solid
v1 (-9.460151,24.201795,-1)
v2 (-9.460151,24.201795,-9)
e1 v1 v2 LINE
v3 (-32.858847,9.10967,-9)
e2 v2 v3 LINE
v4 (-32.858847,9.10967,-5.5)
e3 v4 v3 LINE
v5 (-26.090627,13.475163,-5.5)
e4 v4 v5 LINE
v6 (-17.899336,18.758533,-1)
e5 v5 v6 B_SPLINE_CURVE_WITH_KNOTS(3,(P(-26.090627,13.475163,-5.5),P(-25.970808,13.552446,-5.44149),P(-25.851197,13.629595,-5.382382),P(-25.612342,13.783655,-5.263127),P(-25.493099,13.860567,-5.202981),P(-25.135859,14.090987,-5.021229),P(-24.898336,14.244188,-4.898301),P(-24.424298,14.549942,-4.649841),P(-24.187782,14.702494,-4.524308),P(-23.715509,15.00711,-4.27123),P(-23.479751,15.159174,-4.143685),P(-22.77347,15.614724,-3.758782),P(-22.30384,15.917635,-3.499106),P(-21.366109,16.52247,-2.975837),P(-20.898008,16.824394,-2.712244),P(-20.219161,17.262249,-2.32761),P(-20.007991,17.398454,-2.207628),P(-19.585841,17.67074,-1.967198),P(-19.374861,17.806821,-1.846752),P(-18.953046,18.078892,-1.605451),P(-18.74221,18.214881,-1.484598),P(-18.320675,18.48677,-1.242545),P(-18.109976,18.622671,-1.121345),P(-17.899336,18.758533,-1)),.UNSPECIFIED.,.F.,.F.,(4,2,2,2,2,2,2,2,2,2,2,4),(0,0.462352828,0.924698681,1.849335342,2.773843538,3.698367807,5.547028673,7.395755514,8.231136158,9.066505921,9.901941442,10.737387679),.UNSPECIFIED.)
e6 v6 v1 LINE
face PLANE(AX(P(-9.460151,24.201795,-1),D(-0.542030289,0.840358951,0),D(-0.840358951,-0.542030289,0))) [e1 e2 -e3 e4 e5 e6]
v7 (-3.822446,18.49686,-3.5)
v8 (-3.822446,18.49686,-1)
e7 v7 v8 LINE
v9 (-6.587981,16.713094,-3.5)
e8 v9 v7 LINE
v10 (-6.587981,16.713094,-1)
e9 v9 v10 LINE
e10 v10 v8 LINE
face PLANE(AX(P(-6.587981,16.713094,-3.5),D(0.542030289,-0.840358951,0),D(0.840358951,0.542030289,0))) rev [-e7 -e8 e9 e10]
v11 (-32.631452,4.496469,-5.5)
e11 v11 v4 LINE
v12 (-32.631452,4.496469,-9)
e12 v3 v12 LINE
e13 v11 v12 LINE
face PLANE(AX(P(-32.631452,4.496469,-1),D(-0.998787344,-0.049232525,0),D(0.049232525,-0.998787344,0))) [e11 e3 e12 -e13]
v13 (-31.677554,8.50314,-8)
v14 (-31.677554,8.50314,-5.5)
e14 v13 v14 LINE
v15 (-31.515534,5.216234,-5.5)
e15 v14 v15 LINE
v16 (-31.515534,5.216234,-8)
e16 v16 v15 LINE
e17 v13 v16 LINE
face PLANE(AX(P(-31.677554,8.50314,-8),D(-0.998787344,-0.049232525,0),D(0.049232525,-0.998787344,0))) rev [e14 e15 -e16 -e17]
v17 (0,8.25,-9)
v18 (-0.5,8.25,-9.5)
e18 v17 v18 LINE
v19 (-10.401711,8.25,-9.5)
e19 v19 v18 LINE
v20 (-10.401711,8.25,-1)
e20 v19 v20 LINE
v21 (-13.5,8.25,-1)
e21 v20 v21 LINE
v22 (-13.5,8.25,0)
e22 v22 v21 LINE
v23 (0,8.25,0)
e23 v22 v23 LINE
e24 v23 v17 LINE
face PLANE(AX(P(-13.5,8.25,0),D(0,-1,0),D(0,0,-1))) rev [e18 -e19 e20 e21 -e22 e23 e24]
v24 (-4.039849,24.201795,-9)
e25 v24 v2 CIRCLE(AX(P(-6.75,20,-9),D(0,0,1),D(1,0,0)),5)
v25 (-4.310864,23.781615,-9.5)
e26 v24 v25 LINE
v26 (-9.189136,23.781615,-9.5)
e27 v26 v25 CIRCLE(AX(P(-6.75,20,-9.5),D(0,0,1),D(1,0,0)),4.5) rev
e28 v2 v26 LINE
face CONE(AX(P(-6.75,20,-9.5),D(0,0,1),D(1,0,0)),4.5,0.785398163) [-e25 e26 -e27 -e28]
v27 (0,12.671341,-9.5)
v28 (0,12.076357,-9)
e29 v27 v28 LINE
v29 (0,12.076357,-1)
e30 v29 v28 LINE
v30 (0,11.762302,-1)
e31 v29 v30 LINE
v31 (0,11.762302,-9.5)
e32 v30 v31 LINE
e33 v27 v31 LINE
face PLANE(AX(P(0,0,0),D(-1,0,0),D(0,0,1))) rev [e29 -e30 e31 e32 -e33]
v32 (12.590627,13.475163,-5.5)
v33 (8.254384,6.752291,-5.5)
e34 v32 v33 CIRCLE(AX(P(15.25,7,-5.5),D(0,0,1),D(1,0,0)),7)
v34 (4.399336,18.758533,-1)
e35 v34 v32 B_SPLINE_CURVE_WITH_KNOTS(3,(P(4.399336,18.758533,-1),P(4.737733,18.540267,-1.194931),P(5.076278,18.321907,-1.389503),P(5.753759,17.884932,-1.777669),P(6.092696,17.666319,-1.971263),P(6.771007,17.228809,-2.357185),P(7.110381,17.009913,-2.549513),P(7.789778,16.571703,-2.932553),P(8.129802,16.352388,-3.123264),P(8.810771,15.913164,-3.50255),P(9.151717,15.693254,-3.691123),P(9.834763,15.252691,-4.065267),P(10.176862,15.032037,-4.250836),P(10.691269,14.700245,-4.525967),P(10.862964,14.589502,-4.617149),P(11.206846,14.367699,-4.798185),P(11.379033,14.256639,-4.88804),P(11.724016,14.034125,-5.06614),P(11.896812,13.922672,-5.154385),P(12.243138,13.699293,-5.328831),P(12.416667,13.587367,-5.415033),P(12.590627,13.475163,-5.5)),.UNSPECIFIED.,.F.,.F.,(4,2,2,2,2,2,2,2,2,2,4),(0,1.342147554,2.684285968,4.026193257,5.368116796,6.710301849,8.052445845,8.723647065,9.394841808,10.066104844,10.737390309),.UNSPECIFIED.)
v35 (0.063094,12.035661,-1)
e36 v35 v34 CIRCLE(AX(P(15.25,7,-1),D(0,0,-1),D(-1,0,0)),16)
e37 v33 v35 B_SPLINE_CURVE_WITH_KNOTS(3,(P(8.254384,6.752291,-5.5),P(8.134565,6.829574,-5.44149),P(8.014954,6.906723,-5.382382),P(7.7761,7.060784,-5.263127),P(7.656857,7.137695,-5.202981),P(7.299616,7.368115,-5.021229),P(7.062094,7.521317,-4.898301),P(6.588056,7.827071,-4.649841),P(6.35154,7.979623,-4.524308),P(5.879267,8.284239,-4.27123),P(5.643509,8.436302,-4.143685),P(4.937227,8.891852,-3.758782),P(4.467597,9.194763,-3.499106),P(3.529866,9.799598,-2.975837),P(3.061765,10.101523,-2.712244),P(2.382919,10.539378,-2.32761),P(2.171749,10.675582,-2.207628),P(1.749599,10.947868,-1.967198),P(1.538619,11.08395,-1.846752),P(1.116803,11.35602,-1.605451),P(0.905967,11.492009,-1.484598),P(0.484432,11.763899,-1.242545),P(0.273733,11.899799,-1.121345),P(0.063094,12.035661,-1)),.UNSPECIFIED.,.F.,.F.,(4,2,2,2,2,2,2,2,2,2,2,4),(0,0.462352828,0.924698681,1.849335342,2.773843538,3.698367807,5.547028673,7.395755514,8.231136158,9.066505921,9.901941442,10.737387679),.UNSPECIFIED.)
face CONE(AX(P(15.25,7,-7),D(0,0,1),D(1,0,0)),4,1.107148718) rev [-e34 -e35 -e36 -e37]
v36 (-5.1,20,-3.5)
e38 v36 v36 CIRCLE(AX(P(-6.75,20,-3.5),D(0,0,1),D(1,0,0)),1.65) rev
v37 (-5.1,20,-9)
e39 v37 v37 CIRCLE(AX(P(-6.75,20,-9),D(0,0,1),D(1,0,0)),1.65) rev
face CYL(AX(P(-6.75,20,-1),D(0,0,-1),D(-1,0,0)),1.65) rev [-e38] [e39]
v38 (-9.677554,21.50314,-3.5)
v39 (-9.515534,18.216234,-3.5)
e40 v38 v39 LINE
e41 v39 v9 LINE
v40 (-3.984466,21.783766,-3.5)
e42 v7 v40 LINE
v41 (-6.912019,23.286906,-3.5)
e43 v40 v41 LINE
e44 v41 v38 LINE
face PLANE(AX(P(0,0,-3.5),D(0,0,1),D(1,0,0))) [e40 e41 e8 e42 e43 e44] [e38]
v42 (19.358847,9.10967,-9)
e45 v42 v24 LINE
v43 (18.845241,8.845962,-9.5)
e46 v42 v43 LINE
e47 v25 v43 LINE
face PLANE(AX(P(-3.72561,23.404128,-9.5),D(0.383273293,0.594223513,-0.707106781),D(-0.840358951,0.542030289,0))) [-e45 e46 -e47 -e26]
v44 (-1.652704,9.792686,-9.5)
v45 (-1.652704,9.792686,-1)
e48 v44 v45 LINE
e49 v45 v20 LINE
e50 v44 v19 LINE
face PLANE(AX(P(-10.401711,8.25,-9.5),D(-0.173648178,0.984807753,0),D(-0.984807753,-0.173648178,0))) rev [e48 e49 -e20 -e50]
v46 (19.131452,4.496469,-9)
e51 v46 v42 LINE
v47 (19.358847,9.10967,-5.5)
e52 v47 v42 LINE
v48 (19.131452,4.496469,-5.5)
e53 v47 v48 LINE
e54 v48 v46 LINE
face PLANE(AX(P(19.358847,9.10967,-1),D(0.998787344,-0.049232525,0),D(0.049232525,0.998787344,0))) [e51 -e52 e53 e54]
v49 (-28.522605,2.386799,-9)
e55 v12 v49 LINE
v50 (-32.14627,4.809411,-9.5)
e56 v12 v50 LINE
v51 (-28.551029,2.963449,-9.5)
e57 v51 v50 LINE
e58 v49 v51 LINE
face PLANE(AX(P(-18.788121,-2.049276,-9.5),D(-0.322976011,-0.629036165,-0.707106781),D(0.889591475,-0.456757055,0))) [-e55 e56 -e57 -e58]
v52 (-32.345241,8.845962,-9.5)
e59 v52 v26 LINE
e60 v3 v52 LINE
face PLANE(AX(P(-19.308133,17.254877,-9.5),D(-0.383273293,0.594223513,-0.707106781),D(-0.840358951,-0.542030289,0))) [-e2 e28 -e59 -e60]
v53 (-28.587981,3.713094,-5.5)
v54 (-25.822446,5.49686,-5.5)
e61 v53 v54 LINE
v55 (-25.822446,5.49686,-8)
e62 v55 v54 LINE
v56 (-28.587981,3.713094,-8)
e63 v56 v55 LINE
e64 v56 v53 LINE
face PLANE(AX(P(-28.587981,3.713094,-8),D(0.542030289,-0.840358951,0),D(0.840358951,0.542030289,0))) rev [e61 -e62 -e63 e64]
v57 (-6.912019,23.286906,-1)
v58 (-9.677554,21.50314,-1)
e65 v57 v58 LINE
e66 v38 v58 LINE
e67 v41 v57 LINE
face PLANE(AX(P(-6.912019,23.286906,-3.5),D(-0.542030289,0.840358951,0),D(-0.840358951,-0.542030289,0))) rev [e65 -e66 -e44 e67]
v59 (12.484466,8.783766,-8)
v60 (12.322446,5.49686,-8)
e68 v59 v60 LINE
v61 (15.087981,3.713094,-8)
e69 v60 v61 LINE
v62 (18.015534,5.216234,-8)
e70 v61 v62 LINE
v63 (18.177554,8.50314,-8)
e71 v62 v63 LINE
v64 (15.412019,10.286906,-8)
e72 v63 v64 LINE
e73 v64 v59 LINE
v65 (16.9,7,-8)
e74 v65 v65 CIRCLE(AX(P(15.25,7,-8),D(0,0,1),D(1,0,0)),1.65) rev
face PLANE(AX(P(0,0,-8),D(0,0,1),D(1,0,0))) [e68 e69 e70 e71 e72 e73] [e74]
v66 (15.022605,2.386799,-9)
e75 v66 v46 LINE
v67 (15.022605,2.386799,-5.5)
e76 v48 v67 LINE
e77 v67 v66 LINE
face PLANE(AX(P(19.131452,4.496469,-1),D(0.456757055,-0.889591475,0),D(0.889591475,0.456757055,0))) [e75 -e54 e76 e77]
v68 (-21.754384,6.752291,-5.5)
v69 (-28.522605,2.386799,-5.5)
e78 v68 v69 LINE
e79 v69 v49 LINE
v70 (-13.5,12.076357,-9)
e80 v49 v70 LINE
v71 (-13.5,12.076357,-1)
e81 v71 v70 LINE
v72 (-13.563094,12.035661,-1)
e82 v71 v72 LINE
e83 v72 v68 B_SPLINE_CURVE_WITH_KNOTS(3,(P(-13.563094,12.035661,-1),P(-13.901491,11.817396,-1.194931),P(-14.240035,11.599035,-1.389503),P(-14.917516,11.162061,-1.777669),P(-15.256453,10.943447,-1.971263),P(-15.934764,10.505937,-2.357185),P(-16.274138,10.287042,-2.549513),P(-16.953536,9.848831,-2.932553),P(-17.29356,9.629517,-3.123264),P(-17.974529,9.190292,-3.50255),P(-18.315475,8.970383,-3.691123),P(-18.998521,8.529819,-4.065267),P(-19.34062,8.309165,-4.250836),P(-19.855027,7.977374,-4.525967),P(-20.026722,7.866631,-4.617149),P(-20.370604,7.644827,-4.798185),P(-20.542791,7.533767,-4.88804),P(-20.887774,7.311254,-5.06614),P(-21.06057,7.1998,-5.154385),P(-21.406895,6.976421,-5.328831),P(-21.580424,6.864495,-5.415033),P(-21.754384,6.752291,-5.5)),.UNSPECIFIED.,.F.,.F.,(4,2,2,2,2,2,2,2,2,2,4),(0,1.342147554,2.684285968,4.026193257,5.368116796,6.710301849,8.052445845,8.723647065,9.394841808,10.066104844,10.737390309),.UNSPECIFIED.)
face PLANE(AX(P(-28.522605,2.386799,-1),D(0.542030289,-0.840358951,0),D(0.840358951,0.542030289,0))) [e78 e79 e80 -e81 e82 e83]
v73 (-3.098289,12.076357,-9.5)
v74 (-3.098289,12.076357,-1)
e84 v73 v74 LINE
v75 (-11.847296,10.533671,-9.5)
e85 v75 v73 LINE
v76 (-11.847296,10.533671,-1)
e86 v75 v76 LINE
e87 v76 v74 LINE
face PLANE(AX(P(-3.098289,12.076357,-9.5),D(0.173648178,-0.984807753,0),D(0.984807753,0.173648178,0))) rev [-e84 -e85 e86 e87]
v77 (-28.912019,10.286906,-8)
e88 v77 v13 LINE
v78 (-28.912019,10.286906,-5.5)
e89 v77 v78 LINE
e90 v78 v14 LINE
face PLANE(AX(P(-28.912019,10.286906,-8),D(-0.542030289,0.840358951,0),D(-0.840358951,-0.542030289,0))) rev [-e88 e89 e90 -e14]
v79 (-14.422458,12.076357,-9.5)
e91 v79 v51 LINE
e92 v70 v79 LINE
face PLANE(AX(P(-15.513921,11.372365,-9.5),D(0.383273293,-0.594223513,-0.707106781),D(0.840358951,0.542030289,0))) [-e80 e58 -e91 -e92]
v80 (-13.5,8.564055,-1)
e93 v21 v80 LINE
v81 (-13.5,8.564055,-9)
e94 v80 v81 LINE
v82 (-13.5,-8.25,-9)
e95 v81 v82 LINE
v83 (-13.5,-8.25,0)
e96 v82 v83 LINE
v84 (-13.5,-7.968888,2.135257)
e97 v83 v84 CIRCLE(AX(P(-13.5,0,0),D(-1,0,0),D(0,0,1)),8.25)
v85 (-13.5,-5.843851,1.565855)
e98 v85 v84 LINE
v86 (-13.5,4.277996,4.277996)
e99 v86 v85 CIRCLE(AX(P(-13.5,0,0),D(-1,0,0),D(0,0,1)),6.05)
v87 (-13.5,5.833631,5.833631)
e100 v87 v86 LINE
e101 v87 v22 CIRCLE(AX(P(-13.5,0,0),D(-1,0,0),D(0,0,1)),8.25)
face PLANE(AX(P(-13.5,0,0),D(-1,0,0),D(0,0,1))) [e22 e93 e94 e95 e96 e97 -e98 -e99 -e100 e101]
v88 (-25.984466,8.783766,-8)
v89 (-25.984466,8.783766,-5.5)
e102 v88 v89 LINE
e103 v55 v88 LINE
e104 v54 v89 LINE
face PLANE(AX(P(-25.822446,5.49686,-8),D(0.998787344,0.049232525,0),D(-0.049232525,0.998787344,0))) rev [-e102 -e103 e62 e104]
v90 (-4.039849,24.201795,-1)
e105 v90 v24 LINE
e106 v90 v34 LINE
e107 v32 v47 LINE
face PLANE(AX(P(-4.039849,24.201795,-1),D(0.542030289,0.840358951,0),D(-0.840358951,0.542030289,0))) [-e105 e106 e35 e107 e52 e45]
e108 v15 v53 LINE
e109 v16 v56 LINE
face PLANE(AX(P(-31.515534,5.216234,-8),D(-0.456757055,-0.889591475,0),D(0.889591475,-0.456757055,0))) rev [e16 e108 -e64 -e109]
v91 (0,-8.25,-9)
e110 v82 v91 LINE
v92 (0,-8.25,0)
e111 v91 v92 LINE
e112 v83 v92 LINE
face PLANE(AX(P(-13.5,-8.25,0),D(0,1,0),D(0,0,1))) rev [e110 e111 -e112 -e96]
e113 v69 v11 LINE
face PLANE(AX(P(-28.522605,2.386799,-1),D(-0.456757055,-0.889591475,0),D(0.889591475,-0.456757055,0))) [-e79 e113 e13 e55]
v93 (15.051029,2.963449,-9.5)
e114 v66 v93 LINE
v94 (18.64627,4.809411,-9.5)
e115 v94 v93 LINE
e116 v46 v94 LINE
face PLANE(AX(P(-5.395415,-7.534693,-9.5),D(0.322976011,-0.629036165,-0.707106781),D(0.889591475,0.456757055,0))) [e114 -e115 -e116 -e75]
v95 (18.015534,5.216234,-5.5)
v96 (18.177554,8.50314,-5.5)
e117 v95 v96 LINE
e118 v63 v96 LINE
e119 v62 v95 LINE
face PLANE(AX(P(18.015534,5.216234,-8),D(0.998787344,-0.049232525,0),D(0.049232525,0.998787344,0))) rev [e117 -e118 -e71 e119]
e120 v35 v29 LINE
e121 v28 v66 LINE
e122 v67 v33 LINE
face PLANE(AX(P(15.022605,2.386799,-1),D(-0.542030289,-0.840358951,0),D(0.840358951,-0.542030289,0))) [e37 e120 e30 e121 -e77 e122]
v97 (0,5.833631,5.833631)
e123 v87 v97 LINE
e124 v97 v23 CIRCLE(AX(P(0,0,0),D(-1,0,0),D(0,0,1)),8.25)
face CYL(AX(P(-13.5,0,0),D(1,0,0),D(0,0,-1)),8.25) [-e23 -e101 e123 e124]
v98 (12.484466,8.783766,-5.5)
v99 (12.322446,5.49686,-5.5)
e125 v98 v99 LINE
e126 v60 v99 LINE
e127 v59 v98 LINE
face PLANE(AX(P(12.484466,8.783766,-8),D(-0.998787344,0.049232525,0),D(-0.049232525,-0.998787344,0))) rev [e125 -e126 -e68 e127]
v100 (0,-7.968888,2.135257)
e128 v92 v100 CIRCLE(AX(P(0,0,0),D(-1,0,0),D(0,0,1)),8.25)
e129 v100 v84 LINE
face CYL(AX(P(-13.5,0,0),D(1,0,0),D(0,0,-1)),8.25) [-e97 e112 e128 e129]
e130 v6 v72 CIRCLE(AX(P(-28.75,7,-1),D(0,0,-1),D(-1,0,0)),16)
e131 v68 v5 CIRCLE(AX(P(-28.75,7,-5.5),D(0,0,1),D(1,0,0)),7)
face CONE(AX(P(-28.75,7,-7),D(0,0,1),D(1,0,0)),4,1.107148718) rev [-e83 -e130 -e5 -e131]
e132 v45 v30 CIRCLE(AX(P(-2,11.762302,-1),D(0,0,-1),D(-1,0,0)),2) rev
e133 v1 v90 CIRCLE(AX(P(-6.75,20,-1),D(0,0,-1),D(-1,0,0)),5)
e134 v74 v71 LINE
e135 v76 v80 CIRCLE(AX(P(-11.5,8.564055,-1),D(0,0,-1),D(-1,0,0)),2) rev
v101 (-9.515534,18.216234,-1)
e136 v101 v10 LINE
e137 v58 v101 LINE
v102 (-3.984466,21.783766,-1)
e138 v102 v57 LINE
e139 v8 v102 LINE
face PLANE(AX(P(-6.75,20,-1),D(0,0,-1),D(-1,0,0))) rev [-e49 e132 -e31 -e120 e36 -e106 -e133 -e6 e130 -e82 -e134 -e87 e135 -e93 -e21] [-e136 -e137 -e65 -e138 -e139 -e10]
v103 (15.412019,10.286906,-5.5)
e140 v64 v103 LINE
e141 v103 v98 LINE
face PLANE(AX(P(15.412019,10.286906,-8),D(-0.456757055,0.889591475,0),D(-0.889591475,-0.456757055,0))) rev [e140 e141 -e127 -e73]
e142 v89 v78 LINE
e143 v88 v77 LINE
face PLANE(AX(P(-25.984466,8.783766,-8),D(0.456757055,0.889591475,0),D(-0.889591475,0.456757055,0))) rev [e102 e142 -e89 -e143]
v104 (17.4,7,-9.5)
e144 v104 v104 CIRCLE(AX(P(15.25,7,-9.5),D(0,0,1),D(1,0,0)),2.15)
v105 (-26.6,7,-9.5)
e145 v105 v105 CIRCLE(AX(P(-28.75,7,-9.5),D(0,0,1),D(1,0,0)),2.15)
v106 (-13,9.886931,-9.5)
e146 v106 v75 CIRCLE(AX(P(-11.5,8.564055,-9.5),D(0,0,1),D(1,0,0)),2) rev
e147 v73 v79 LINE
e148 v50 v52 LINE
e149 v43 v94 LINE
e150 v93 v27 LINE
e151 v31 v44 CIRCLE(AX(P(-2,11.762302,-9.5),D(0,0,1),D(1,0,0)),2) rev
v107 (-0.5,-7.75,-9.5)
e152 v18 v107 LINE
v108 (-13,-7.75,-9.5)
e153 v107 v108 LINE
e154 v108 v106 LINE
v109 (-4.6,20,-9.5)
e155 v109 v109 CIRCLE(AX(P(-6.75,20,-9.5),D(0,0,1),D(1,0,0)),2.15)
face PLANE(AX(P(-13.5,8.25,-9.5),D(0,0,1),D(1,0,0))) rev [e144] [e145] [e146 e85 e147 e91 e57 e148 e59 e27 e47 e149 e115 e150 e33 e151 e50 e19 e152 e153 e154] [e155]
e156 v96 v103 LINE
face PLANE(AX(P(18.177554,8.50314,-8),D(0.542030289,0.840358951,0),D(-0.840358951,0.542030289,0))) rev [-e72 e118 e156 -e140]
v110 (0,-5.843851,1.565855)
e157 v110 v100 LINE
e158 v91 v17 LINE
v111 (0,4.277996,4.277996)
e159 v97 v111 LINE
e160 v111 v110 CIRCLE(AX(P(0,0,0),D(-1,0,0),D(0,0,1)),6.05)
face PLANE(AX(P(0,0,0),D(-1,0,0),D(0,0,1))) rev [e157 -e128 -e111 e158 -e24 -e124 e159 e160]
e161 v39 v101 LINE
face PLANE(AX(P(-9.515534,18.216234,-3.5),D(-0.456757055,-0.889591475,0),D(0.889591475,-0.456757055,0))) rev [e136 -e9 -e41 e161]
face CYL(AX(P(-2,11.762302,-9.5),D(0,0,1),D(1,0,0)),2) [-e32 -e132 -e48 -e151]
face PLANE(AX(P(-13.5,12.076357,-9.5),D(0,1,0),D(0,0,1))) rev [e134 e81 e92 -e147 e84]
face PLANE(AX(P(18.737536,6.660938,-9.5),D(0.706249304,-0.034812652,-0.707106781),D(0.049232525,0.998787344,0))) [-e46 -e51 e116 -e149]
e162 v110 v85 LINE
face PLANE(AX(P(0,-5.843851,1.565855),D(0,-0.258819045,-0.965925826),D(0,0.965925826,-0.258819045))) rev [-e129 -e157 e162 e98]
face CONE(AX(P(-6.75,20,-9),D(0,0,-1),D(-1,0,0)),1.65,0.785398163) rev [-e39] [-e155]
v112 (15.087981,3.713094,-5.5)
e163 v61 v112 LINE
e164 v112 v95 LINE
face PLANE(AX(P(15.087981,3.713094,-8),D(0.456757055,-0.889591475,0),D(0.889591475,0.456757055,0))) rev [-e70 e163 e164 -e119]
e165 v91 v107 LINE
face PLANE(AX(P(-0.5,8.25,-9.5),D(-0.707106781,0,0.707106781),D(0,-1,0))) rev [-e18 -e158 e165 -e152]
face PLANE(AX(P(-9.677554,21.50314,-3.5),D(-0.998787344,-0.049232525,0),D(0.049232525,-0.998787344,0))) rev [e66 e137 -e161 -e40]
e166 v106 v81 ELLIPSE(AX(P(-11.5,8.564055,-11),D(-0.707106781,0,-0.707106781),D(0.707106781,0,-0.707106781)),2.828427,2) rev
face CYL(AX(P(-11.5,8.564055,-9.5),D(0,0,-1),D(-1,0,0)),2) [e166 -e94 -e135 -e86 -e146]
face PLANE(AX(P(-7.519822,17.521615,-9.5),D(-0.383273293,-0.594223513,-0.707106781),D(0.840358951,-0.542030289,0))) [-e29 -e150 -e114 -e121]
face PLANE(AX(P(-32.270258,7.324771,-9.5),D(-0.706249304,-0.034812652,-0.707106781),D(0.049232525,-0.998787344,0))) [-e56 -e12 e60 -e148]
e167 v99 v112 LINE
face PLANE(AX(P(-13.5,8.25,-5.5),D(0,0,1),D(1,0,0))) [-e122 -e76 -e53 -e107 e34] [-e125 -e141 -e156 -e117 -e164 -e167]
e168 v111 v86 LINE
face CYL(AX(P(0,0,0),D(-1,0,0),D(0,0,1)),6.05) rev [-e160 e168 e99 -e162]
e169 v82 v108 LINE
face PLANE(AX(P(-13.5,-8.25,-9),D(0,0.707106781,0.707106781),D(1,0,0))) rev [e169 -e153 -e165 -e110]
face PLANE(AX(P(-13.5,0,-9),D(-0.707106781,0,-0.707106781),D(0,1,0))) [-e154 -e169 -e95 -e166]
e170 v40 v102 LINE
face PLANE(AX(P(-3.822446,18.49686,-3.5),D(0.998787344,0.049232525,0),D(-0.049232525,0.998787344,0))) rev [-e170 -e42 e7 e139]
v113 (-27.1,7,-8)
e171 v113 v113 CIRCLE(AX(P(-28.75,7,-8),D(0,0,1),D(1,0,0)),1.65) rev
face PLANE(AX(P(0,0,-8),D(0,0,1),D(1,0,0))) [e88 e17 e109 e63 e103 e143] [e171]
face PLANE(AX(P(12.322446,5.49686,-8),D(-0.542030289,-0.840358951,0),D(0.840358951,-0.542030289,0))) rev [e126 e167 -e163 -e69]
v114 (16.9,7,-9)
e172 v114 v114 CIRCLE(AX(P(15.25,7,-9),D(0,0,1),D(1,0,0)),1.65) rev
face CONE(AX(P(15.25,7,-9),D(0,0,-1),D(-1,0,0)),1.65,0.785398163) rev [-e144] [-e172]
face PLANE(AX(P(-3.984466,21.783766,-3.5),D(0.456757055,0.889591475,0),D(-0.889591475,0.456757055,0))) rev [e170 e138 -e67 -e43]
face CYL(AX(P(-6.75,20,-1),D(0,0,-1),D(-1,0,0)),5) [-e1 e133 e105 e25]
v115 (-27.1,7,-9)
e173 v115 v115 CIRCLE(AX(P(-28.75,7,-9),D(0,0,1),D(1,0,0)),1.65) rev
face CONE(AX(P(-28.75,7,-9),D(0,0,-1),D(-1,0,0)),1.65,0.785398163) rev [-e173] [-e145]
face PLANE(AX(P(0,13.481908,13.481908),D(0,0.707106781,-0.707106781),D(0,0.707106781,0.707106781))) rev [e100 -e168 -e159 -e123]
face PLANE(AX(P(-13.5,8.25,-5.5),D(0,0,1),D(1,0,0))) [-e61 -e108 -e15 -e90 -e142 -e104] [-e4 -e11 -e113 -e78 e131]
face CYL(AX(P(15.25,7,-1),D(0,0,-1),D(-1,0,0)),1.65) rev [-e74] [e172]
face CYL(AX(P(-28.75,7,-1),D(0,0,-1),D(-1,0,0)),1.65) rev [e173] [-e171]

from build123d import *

# Parameters (mm, degrees)
BOSS_EXTRUDE1_DEPTH = 13.5
CUT_EXTRUDE1_DEPTH  = 19.454335534
SKETCH14_R          = 1.65
BOSS_EXTRUDE3_DEPTH = 8.5
CUT_EXTRUDE7_DEPTH  = 43.153930156
FILLET2_R           = 2
CUT_EXTRUDE9_DEPTH  = 4.5
CHAMFER2_SIZE       = 12
CHAMFER2_SIZE_2     = 6
CHAMFER3_SIZE       = 6
CHAMFER3_SIZE_2     = 12
CUT_EXTRUDE11_DEPTH = 2.5
CUT_EXTRUDE12_DEPTH = 2.5
CHAMFER4_SIZE       = 0.5
CHAMFER8_SIZE       = 0.5


with BuildPart() as part:
    # Sketch1 → Boss-Extrude1 (new body)
    with BuildSketch(Plane.ZY):
        with BuildLine():
            Line((-9.5, 8.25), (-9.5, -8.25))
            Line((-9.5, -8.25), (0, -8.25))
            ThreePointArc((0, -8.25), (8.25, 0), (0, 8.25))
            Line((0, 8.25), (-9.5, 8.25))
        make_face()
    extrude(amount=BOSS_EXTRUDE1_DEPTH)

    # Sketch7 → Cut-Extrude1 (cut, through all)
    with BuildSketch(Plane.ZY.offset(13.5)):
        with BuildLine():
            Line((13.481907846, 13.481907846), (4.277996026, 4.277996026))
            ThreePointArc((4.277996026, 4.277996026), (-5.843851249, 1.565855223), (1.565855223, -5.843851249))
            Line((1.565855223, -5.843851249), (4.934720763, -18.416628609))
            Line((4.934720763, -18.416628609), (13.481907846, 13.481907846))
        make_face()
    extrude(amount=-CUT_EXTRUDE1_DEPTH, mode=Mode.SUBTRACT)

    # Sketch14 → Boss-Extrude3 (add)
    with BuildSketch(Plane(origin=(0, 0, -9.5), x_dir=(-1, 0, 0), z_dir=(0, 0, -1))):
        with BuildLine():
            Line((4.039848555, 24.201794753), (-19.358847021, 9.109670469))
            Line((-19.358847021, 9.109670469), (-19.131451731, 4.496469334))
            Line((-19.131451731, 4.496469334), (-15.022604709, 2.386798865))
            Line((-15.022604709, 2.386798865), (0, 12.07635684))
            Line((0, 12.07635684), (0, 8.25))
            Line((0, 8.25), (13.5, 8.25))
            Line((13.5, 8.25), (13.5, 12.07635684))
            Line((13.5, 12.07635684), (28.522604709, 2.386798865))
            Line((28.522604709, 2.386798865), (32.631451731, 4.496469334))
            Line((32.631451731, 4.496469334), (32.858847021, 9.109670469))
            Line((32.858847021, 9.109670469), (9.460151445, 24.201794753))
            ThreePointArc((9.460151445, 24.201794753), (6.75, 25), (4.039848555, 24.201794753))
        make_face()
        with Locations((6.75, 20)):
            Circle(SKETCH14_R, mode=Mode.SUBTRACT)
        with Locations((-15.25, 7)):
            Circle(SKETCH14_R, mode=Mode.SUBTRACT)
        with Locations(Location((28.75, 7, 0), (0, 0, 180))):
            Circle(SKETCH14_R, mode=Mode.SUBTRACT)
    extrude(amount=-BOSS_EXTRUDE3_DEPTH)

    # Sketch15 → Cut-Extrude7 (cut, through all)
    with BuildSketch(Plane.XY.offset(-1)):
        Polygon((0, 8.25), (-10.401710887, 8.25), (0, 10.084102275), align=None)
        Polygon((-13.5, 10.242254565), (-13.5, 12.07635684), (-3.098289113, 12.07635684), align=None)
    extrude(amount=-CUT_EXTRUDE7_DEPTH, mode=Mode.SUBTRACT)

    # Fillet2
    fillet2_edges = [part.edges().sort_by_distance(p)[0] for p in [
        (0, 10.084102275, -5.25),
        (-13.5, 10.242254565, -5.25),
    ]]
    fillet(fillet2_edges, radius=FILLET2_R)

    # Sketch17 → Cut-Extrude9 (cut)
    with BuildSketch(Plane.XY.offset(-1)):
        with BuildLine():
            Line((19.131451731, 4.496469334), (19.358847021, 9.109670469))
            Line((19.358847021, 9.109670469), (17.418121156, 10.361435802))
            ThreePointArc((17.418121156, 10.361435802), (11.888564198, 9.168121156), (13.081878844, 3.638564198))
            Line((13.081878844, 3.638564198), (15.022604709, 2.386798865))
            Line((15.022604709, 2.386798865), (19.131451731, 4.496469334))
        make_face()
        with BuildLine():
            Line((-32.631451731, 4.496469334), (-28.522604709, 2.386798865))
            Line((-28.522604709, 2.386798865), (-26.581878844, 3.638564198))
            ThreePointArc((-26.581878844, 3.638564198), (-25.388564198, 9.168121156), (-30.918121156, 10.361435802))
            Line((-30.918121156, 10.361435802), (-32.858847021, 9.109670469))
            Line((-32.858847021, 9.109670469), (-32.631451731, 4.496469334))
        make_face()
    extrude(amount=-CUT_EXTRUDE9_DEPTH, mode=Mode.SUBTRACT)

    # Chamfer2
    # the kernel refuses this chamfer: 12, 6 mm, written as the material it takes off along each edge
    with BuildSketch(Plane(origin=(-28.75, 7, -1), x_dir=(-0.8386519680093931, -0.5446676753342096, 0), z_dir=(-0.5446676753342096, 0.8386519680093931, 0))) as chamfer2_piece_1_section:
        Polygon((4 + CHAMFER2_SIZE, 0), (4, -CHAMFER2_SIZE_2), (4, 0), align=None)
    chamfer2_piece_1 = revolve(axis=Axis((-28.75, 7, -1), (0, 0, 1)), revolution_arc=359.64, mode=Mode.PRIVATE)
    chamfer2_piece_1 = split(chamfer2_piece_1, bisect_by=Plane(origin=(-26.581878844, 3.638564198, -1), z_dir=(-0.5420302889814643, 0.8403589505840171, 0)), keep=Keep.TOP, mode=Mode.PRIVATE)
    chamfer2_piece_1 = split(chamfer2_piece_1, bisect_by=Plane(origin=(-28.75, 7, -5.5), z_dir=(0, 0, 1)), keep=Keep.TOP, mode=Mode.PRIVATE)
    add(chamfer2_piece_1, mode=Mode.SUBTRACT)

    # Chamfer3
    # the kernel refuses this chamfer: 12, 6 mm, written as the material it takes off along each edge
    with BuildSketch(Plane(origin=(15.25, 7, -1), x_dir=(0.8420576391550663, -0.5393875530085916, 0), z_dir=(-0.5393875530085916, -0.8420576391550663, 0))) as chamfer3_piece_1_section:
        Polygon((4, -CHAMFER3_SIZE), (4 + CHAMFER3_SIZE_2, 0), (4, 0), align=None)
    chamfer3_piece_1 = revolve(axis=Axis((15.25, 7, -1), (0, 0, 1)), revolution_arc=359.64, mode=Mode.PRIVATE)
    chamfer3_piece_1 = split(chamfer3_piece_1, bisect_by=Plane(origin=(15.25, 7, -5.5), z_dir=(0, 0, 1)), keep=Keep.TOP, mode=Mode.PRIVATE)
    chamfer3_piece_1 = split(chamfer3_piece_1, bisect_by=Plane(origin=(0, 7, -1), z_dir=(1, 0, 0)), keep=Keep.TOP, mode=Mode.PRIVATE)
    add(chamfer3_piece_1, mode=Mode.SUBTRACT)

    # Sketch19 → Cut-Extrude11 (cut)
    with BuildSketch(Plane.XY.offset(-5.5)):
        Polygon((-31.515534358, 5.2162344), (-28.587980855, 3.713094191), (-25.822446497, 5.496859791), (-25.984465642, 8.7837656), (-28.912019145, 10.286905809), (-31.677553503, 8.503140209), align=None)
        Polygon((18.015534358, 5.2162344), (18.177553503, 8.503140209), (15.412019145, 10.286905809), (12.484465642, 8.7837656), (12.322446497, 5.496859791), (15.087980855, 3.713094191), align=None)
    extrude(amount=-CUT_EXTRUDE11_DEPTH, mode=Mode.SUBTRACT)

    # Sketch20 → Cut-Extrude12 (cut)
    with BuildSketch(Plane.XY.offset(-1)):
        Polygon((-9.515534358, 18.2162344), (-6.587980855, 16.713094191), (-3.822446497, 18.496859791), (-3.984465642, 21.7837656), (-6.912019145, 23.286905809), (-9.677553503, 21.503140209), align=None)
    extrude(amount=-CUT_EXTRUDE12_DEPTH, mode=Mode.SUBTRACT)

    # Chamfer4
    chamfer4_edges = [part.edges().sort_by_distance(p)[0] for p in [
        (-5.1, 20, -9.5),
        (16.9, 7, -9.5),
        (-30.4, 7, -9.5),
    ]]
    chamfer(chamfer4_edges, length=CHAMFER4_SIZE)

    # Chamfer8
    # the kernel refuses this chamfer: 0.5 mm, written as the material it takes off along each edge
    with BuildSketch(Plane(origin=(-13.5, 10.749985843, -9.5), x_dir=(1, 0, 0), z_dir=(0, -1, 0))) as chamfer8_piece_1:
        Polygon((CHAMFER8_SIZE, 0), (0, CHAMFER8_SIZE), (0, 0), align=None)
    extrude(amount=20.285827337, mode=Mode.SUBTRACT)
    with BuildSketch(Plane(origin=(-12.419431591, 12.773321877, -9.5), x_dir=(-0.5420302889814643, 0.8403589505840171, 0), z_dir=(-0.8403589505840171, -0.5420302889814643, 0))) as chamfer8_piece_2_section:
        Polygon((CHAMFER8_SIZE, 0), (0, -CHAMFER8_SIZE), (0, 0), align=None)
    chamfer8_piece_2 = extrude(amount=20.448097226, mode=Mode.PRIVATE)
    chamfer8_piece_2 = split(chamfer8_piece_2, bisect_by=Plane(origin=(-12.419431591, 12.07635684, -9.5), z_dir=(0, -1, 0)), keep=Keep.TOP, mode=Mode.PRIVATE)
    add(chamfer8_piece_2, mode=Mode.SUBTRACT)
    with BuildSketch(Plane(origin=(-27.378731078, 1.799481691, -9.5), x_dir=(0.4567570550126589, 0.8895914751705769, 0), z_dir=(-0.8895914751705769, 0.4567570550126589, 0)), Plane(origin=(-32.568146508, 3.212187123, -9.5), x_dir=(0.9987873439941226, 0.04923252458656117, 0), z_dir=(-0.04923252458656117, 0.9987873439941226, 0)), Plane(origin=(19.422152244, 10.39395268, -9.5), x_dir=(-0.9987873439941226, 0.049232524586561265, 0), z_dir=(-0.049232524586561265, -0.9987873439941226, 0)), Plane(origin=(20.275325362, 5.083786508, -9.5), x_dir=(-0.4567570550126585, 0.8895914751705769, 0), z_dir=(-0.889591475170577, -0.45675705501265856, 0))) as chamfer8_piece_3:
        Polygon((CHAMFER8_SIZE, 0), (0, -CHAMFER8_SIZE), (0, 0), align=None)
    extrude(amount=7.190485141, mode=Mode.SUBTRACT)
    with BuildSketch(Plane(origin=(-33.93941543, 8.412705433, -9.5), x_dir=(0.5420302889814647, -0.8403589505840169, 0), z_dir=(0.8403589505840168, 0.5420302889814647, 0)), Plane(origin=(-4.039848555, 24.201794753, -9.5), x_dir=(-0.5420302889814645, -0.840358950584017, 0), z_dir=(0.8403589505840169, -0.5420302889814645, 0))) as chamfer8_piece_4:
        Polygon((CHAMFER8_SIZE, 0), (0, -CHAMFER8_SIZE), (0, 0), align=None)
    extrude(amount=29.12953324, mode=Mode.SUBTRACT)
    with BuildSketch(Plane(origin=(-6.75, 20, -9.5), x_dir=(-0.5420302889814639, 0.8403589505840172, 0), z_dir=(-0.8403589505840172, -0.5420302889814639, 0))) as chamfer8_piece_5:
        Polygon((5 - CHAMFER8_SIZE, 0), (5, -CHAMFER8_SIZE), (5, 0), align=None)
    revolve(axis=Axis((-6.75, 20, -9.5), (0, 0, -1)), revolution_arc=65.643913307, mode=Mode.SUBTRACT)
    with BuildSketch(Plane(origin=(16.103173118, 1.689833828, -9.5), x_dir=(0.5420302889814647, 0.8403589505840168, 0), z_dir=(-0.8403589505840168, 0.5420302889814647, 0))) as chamfer8_piece_6_section:
        Polygon((CHAMFER8_SIZE, 0), (0, -CHAMFER8_SIZE), (0, 0), align=None)
    chamfer8_piece_6 = extrude(amount=20.448097226, mode=Mode.PRIVATE)
    chamfer8_piece_6 = split(chamfer8_piece_6, bisect_by=Plane(origin=(0, 1.689833828, -9.5), z_dir=(1, 0, 0)), keep=Keep.TOP, mode=Mode.PRIVATE)
    add(chamfer8_piece_6, mode=Mode.SUBTRACT)
    with BuildSketch(Plane(origin=(0, -9.535841494, -9.5), x_dir=(-1, 0, 0), z_dir=(0, 1, 0))) as chamfer8_piece_7:
        Polygon((CHAMFER8_SIZE, 0), (0, CHAMFER8_SIZE), (0, 0), align=None)
    extrude(amount=19.071682988, mode=Mode.SUBTRACT)
    with BuildSketch(Plane(origin=(1.285841494, -8.25, -9.5), x_dir=(0, 1, 0), z_dir=(-1, 0, 0))) as chamfer8_piece_8:
        Polygon((CHAMFER8_SIZE, 0), (0, -CHAMFER8_SIZE), (0, 0), align=None)
    extrude(amount=16.071682988, mode=Mode.SUBTRACT)


solid = part.part
